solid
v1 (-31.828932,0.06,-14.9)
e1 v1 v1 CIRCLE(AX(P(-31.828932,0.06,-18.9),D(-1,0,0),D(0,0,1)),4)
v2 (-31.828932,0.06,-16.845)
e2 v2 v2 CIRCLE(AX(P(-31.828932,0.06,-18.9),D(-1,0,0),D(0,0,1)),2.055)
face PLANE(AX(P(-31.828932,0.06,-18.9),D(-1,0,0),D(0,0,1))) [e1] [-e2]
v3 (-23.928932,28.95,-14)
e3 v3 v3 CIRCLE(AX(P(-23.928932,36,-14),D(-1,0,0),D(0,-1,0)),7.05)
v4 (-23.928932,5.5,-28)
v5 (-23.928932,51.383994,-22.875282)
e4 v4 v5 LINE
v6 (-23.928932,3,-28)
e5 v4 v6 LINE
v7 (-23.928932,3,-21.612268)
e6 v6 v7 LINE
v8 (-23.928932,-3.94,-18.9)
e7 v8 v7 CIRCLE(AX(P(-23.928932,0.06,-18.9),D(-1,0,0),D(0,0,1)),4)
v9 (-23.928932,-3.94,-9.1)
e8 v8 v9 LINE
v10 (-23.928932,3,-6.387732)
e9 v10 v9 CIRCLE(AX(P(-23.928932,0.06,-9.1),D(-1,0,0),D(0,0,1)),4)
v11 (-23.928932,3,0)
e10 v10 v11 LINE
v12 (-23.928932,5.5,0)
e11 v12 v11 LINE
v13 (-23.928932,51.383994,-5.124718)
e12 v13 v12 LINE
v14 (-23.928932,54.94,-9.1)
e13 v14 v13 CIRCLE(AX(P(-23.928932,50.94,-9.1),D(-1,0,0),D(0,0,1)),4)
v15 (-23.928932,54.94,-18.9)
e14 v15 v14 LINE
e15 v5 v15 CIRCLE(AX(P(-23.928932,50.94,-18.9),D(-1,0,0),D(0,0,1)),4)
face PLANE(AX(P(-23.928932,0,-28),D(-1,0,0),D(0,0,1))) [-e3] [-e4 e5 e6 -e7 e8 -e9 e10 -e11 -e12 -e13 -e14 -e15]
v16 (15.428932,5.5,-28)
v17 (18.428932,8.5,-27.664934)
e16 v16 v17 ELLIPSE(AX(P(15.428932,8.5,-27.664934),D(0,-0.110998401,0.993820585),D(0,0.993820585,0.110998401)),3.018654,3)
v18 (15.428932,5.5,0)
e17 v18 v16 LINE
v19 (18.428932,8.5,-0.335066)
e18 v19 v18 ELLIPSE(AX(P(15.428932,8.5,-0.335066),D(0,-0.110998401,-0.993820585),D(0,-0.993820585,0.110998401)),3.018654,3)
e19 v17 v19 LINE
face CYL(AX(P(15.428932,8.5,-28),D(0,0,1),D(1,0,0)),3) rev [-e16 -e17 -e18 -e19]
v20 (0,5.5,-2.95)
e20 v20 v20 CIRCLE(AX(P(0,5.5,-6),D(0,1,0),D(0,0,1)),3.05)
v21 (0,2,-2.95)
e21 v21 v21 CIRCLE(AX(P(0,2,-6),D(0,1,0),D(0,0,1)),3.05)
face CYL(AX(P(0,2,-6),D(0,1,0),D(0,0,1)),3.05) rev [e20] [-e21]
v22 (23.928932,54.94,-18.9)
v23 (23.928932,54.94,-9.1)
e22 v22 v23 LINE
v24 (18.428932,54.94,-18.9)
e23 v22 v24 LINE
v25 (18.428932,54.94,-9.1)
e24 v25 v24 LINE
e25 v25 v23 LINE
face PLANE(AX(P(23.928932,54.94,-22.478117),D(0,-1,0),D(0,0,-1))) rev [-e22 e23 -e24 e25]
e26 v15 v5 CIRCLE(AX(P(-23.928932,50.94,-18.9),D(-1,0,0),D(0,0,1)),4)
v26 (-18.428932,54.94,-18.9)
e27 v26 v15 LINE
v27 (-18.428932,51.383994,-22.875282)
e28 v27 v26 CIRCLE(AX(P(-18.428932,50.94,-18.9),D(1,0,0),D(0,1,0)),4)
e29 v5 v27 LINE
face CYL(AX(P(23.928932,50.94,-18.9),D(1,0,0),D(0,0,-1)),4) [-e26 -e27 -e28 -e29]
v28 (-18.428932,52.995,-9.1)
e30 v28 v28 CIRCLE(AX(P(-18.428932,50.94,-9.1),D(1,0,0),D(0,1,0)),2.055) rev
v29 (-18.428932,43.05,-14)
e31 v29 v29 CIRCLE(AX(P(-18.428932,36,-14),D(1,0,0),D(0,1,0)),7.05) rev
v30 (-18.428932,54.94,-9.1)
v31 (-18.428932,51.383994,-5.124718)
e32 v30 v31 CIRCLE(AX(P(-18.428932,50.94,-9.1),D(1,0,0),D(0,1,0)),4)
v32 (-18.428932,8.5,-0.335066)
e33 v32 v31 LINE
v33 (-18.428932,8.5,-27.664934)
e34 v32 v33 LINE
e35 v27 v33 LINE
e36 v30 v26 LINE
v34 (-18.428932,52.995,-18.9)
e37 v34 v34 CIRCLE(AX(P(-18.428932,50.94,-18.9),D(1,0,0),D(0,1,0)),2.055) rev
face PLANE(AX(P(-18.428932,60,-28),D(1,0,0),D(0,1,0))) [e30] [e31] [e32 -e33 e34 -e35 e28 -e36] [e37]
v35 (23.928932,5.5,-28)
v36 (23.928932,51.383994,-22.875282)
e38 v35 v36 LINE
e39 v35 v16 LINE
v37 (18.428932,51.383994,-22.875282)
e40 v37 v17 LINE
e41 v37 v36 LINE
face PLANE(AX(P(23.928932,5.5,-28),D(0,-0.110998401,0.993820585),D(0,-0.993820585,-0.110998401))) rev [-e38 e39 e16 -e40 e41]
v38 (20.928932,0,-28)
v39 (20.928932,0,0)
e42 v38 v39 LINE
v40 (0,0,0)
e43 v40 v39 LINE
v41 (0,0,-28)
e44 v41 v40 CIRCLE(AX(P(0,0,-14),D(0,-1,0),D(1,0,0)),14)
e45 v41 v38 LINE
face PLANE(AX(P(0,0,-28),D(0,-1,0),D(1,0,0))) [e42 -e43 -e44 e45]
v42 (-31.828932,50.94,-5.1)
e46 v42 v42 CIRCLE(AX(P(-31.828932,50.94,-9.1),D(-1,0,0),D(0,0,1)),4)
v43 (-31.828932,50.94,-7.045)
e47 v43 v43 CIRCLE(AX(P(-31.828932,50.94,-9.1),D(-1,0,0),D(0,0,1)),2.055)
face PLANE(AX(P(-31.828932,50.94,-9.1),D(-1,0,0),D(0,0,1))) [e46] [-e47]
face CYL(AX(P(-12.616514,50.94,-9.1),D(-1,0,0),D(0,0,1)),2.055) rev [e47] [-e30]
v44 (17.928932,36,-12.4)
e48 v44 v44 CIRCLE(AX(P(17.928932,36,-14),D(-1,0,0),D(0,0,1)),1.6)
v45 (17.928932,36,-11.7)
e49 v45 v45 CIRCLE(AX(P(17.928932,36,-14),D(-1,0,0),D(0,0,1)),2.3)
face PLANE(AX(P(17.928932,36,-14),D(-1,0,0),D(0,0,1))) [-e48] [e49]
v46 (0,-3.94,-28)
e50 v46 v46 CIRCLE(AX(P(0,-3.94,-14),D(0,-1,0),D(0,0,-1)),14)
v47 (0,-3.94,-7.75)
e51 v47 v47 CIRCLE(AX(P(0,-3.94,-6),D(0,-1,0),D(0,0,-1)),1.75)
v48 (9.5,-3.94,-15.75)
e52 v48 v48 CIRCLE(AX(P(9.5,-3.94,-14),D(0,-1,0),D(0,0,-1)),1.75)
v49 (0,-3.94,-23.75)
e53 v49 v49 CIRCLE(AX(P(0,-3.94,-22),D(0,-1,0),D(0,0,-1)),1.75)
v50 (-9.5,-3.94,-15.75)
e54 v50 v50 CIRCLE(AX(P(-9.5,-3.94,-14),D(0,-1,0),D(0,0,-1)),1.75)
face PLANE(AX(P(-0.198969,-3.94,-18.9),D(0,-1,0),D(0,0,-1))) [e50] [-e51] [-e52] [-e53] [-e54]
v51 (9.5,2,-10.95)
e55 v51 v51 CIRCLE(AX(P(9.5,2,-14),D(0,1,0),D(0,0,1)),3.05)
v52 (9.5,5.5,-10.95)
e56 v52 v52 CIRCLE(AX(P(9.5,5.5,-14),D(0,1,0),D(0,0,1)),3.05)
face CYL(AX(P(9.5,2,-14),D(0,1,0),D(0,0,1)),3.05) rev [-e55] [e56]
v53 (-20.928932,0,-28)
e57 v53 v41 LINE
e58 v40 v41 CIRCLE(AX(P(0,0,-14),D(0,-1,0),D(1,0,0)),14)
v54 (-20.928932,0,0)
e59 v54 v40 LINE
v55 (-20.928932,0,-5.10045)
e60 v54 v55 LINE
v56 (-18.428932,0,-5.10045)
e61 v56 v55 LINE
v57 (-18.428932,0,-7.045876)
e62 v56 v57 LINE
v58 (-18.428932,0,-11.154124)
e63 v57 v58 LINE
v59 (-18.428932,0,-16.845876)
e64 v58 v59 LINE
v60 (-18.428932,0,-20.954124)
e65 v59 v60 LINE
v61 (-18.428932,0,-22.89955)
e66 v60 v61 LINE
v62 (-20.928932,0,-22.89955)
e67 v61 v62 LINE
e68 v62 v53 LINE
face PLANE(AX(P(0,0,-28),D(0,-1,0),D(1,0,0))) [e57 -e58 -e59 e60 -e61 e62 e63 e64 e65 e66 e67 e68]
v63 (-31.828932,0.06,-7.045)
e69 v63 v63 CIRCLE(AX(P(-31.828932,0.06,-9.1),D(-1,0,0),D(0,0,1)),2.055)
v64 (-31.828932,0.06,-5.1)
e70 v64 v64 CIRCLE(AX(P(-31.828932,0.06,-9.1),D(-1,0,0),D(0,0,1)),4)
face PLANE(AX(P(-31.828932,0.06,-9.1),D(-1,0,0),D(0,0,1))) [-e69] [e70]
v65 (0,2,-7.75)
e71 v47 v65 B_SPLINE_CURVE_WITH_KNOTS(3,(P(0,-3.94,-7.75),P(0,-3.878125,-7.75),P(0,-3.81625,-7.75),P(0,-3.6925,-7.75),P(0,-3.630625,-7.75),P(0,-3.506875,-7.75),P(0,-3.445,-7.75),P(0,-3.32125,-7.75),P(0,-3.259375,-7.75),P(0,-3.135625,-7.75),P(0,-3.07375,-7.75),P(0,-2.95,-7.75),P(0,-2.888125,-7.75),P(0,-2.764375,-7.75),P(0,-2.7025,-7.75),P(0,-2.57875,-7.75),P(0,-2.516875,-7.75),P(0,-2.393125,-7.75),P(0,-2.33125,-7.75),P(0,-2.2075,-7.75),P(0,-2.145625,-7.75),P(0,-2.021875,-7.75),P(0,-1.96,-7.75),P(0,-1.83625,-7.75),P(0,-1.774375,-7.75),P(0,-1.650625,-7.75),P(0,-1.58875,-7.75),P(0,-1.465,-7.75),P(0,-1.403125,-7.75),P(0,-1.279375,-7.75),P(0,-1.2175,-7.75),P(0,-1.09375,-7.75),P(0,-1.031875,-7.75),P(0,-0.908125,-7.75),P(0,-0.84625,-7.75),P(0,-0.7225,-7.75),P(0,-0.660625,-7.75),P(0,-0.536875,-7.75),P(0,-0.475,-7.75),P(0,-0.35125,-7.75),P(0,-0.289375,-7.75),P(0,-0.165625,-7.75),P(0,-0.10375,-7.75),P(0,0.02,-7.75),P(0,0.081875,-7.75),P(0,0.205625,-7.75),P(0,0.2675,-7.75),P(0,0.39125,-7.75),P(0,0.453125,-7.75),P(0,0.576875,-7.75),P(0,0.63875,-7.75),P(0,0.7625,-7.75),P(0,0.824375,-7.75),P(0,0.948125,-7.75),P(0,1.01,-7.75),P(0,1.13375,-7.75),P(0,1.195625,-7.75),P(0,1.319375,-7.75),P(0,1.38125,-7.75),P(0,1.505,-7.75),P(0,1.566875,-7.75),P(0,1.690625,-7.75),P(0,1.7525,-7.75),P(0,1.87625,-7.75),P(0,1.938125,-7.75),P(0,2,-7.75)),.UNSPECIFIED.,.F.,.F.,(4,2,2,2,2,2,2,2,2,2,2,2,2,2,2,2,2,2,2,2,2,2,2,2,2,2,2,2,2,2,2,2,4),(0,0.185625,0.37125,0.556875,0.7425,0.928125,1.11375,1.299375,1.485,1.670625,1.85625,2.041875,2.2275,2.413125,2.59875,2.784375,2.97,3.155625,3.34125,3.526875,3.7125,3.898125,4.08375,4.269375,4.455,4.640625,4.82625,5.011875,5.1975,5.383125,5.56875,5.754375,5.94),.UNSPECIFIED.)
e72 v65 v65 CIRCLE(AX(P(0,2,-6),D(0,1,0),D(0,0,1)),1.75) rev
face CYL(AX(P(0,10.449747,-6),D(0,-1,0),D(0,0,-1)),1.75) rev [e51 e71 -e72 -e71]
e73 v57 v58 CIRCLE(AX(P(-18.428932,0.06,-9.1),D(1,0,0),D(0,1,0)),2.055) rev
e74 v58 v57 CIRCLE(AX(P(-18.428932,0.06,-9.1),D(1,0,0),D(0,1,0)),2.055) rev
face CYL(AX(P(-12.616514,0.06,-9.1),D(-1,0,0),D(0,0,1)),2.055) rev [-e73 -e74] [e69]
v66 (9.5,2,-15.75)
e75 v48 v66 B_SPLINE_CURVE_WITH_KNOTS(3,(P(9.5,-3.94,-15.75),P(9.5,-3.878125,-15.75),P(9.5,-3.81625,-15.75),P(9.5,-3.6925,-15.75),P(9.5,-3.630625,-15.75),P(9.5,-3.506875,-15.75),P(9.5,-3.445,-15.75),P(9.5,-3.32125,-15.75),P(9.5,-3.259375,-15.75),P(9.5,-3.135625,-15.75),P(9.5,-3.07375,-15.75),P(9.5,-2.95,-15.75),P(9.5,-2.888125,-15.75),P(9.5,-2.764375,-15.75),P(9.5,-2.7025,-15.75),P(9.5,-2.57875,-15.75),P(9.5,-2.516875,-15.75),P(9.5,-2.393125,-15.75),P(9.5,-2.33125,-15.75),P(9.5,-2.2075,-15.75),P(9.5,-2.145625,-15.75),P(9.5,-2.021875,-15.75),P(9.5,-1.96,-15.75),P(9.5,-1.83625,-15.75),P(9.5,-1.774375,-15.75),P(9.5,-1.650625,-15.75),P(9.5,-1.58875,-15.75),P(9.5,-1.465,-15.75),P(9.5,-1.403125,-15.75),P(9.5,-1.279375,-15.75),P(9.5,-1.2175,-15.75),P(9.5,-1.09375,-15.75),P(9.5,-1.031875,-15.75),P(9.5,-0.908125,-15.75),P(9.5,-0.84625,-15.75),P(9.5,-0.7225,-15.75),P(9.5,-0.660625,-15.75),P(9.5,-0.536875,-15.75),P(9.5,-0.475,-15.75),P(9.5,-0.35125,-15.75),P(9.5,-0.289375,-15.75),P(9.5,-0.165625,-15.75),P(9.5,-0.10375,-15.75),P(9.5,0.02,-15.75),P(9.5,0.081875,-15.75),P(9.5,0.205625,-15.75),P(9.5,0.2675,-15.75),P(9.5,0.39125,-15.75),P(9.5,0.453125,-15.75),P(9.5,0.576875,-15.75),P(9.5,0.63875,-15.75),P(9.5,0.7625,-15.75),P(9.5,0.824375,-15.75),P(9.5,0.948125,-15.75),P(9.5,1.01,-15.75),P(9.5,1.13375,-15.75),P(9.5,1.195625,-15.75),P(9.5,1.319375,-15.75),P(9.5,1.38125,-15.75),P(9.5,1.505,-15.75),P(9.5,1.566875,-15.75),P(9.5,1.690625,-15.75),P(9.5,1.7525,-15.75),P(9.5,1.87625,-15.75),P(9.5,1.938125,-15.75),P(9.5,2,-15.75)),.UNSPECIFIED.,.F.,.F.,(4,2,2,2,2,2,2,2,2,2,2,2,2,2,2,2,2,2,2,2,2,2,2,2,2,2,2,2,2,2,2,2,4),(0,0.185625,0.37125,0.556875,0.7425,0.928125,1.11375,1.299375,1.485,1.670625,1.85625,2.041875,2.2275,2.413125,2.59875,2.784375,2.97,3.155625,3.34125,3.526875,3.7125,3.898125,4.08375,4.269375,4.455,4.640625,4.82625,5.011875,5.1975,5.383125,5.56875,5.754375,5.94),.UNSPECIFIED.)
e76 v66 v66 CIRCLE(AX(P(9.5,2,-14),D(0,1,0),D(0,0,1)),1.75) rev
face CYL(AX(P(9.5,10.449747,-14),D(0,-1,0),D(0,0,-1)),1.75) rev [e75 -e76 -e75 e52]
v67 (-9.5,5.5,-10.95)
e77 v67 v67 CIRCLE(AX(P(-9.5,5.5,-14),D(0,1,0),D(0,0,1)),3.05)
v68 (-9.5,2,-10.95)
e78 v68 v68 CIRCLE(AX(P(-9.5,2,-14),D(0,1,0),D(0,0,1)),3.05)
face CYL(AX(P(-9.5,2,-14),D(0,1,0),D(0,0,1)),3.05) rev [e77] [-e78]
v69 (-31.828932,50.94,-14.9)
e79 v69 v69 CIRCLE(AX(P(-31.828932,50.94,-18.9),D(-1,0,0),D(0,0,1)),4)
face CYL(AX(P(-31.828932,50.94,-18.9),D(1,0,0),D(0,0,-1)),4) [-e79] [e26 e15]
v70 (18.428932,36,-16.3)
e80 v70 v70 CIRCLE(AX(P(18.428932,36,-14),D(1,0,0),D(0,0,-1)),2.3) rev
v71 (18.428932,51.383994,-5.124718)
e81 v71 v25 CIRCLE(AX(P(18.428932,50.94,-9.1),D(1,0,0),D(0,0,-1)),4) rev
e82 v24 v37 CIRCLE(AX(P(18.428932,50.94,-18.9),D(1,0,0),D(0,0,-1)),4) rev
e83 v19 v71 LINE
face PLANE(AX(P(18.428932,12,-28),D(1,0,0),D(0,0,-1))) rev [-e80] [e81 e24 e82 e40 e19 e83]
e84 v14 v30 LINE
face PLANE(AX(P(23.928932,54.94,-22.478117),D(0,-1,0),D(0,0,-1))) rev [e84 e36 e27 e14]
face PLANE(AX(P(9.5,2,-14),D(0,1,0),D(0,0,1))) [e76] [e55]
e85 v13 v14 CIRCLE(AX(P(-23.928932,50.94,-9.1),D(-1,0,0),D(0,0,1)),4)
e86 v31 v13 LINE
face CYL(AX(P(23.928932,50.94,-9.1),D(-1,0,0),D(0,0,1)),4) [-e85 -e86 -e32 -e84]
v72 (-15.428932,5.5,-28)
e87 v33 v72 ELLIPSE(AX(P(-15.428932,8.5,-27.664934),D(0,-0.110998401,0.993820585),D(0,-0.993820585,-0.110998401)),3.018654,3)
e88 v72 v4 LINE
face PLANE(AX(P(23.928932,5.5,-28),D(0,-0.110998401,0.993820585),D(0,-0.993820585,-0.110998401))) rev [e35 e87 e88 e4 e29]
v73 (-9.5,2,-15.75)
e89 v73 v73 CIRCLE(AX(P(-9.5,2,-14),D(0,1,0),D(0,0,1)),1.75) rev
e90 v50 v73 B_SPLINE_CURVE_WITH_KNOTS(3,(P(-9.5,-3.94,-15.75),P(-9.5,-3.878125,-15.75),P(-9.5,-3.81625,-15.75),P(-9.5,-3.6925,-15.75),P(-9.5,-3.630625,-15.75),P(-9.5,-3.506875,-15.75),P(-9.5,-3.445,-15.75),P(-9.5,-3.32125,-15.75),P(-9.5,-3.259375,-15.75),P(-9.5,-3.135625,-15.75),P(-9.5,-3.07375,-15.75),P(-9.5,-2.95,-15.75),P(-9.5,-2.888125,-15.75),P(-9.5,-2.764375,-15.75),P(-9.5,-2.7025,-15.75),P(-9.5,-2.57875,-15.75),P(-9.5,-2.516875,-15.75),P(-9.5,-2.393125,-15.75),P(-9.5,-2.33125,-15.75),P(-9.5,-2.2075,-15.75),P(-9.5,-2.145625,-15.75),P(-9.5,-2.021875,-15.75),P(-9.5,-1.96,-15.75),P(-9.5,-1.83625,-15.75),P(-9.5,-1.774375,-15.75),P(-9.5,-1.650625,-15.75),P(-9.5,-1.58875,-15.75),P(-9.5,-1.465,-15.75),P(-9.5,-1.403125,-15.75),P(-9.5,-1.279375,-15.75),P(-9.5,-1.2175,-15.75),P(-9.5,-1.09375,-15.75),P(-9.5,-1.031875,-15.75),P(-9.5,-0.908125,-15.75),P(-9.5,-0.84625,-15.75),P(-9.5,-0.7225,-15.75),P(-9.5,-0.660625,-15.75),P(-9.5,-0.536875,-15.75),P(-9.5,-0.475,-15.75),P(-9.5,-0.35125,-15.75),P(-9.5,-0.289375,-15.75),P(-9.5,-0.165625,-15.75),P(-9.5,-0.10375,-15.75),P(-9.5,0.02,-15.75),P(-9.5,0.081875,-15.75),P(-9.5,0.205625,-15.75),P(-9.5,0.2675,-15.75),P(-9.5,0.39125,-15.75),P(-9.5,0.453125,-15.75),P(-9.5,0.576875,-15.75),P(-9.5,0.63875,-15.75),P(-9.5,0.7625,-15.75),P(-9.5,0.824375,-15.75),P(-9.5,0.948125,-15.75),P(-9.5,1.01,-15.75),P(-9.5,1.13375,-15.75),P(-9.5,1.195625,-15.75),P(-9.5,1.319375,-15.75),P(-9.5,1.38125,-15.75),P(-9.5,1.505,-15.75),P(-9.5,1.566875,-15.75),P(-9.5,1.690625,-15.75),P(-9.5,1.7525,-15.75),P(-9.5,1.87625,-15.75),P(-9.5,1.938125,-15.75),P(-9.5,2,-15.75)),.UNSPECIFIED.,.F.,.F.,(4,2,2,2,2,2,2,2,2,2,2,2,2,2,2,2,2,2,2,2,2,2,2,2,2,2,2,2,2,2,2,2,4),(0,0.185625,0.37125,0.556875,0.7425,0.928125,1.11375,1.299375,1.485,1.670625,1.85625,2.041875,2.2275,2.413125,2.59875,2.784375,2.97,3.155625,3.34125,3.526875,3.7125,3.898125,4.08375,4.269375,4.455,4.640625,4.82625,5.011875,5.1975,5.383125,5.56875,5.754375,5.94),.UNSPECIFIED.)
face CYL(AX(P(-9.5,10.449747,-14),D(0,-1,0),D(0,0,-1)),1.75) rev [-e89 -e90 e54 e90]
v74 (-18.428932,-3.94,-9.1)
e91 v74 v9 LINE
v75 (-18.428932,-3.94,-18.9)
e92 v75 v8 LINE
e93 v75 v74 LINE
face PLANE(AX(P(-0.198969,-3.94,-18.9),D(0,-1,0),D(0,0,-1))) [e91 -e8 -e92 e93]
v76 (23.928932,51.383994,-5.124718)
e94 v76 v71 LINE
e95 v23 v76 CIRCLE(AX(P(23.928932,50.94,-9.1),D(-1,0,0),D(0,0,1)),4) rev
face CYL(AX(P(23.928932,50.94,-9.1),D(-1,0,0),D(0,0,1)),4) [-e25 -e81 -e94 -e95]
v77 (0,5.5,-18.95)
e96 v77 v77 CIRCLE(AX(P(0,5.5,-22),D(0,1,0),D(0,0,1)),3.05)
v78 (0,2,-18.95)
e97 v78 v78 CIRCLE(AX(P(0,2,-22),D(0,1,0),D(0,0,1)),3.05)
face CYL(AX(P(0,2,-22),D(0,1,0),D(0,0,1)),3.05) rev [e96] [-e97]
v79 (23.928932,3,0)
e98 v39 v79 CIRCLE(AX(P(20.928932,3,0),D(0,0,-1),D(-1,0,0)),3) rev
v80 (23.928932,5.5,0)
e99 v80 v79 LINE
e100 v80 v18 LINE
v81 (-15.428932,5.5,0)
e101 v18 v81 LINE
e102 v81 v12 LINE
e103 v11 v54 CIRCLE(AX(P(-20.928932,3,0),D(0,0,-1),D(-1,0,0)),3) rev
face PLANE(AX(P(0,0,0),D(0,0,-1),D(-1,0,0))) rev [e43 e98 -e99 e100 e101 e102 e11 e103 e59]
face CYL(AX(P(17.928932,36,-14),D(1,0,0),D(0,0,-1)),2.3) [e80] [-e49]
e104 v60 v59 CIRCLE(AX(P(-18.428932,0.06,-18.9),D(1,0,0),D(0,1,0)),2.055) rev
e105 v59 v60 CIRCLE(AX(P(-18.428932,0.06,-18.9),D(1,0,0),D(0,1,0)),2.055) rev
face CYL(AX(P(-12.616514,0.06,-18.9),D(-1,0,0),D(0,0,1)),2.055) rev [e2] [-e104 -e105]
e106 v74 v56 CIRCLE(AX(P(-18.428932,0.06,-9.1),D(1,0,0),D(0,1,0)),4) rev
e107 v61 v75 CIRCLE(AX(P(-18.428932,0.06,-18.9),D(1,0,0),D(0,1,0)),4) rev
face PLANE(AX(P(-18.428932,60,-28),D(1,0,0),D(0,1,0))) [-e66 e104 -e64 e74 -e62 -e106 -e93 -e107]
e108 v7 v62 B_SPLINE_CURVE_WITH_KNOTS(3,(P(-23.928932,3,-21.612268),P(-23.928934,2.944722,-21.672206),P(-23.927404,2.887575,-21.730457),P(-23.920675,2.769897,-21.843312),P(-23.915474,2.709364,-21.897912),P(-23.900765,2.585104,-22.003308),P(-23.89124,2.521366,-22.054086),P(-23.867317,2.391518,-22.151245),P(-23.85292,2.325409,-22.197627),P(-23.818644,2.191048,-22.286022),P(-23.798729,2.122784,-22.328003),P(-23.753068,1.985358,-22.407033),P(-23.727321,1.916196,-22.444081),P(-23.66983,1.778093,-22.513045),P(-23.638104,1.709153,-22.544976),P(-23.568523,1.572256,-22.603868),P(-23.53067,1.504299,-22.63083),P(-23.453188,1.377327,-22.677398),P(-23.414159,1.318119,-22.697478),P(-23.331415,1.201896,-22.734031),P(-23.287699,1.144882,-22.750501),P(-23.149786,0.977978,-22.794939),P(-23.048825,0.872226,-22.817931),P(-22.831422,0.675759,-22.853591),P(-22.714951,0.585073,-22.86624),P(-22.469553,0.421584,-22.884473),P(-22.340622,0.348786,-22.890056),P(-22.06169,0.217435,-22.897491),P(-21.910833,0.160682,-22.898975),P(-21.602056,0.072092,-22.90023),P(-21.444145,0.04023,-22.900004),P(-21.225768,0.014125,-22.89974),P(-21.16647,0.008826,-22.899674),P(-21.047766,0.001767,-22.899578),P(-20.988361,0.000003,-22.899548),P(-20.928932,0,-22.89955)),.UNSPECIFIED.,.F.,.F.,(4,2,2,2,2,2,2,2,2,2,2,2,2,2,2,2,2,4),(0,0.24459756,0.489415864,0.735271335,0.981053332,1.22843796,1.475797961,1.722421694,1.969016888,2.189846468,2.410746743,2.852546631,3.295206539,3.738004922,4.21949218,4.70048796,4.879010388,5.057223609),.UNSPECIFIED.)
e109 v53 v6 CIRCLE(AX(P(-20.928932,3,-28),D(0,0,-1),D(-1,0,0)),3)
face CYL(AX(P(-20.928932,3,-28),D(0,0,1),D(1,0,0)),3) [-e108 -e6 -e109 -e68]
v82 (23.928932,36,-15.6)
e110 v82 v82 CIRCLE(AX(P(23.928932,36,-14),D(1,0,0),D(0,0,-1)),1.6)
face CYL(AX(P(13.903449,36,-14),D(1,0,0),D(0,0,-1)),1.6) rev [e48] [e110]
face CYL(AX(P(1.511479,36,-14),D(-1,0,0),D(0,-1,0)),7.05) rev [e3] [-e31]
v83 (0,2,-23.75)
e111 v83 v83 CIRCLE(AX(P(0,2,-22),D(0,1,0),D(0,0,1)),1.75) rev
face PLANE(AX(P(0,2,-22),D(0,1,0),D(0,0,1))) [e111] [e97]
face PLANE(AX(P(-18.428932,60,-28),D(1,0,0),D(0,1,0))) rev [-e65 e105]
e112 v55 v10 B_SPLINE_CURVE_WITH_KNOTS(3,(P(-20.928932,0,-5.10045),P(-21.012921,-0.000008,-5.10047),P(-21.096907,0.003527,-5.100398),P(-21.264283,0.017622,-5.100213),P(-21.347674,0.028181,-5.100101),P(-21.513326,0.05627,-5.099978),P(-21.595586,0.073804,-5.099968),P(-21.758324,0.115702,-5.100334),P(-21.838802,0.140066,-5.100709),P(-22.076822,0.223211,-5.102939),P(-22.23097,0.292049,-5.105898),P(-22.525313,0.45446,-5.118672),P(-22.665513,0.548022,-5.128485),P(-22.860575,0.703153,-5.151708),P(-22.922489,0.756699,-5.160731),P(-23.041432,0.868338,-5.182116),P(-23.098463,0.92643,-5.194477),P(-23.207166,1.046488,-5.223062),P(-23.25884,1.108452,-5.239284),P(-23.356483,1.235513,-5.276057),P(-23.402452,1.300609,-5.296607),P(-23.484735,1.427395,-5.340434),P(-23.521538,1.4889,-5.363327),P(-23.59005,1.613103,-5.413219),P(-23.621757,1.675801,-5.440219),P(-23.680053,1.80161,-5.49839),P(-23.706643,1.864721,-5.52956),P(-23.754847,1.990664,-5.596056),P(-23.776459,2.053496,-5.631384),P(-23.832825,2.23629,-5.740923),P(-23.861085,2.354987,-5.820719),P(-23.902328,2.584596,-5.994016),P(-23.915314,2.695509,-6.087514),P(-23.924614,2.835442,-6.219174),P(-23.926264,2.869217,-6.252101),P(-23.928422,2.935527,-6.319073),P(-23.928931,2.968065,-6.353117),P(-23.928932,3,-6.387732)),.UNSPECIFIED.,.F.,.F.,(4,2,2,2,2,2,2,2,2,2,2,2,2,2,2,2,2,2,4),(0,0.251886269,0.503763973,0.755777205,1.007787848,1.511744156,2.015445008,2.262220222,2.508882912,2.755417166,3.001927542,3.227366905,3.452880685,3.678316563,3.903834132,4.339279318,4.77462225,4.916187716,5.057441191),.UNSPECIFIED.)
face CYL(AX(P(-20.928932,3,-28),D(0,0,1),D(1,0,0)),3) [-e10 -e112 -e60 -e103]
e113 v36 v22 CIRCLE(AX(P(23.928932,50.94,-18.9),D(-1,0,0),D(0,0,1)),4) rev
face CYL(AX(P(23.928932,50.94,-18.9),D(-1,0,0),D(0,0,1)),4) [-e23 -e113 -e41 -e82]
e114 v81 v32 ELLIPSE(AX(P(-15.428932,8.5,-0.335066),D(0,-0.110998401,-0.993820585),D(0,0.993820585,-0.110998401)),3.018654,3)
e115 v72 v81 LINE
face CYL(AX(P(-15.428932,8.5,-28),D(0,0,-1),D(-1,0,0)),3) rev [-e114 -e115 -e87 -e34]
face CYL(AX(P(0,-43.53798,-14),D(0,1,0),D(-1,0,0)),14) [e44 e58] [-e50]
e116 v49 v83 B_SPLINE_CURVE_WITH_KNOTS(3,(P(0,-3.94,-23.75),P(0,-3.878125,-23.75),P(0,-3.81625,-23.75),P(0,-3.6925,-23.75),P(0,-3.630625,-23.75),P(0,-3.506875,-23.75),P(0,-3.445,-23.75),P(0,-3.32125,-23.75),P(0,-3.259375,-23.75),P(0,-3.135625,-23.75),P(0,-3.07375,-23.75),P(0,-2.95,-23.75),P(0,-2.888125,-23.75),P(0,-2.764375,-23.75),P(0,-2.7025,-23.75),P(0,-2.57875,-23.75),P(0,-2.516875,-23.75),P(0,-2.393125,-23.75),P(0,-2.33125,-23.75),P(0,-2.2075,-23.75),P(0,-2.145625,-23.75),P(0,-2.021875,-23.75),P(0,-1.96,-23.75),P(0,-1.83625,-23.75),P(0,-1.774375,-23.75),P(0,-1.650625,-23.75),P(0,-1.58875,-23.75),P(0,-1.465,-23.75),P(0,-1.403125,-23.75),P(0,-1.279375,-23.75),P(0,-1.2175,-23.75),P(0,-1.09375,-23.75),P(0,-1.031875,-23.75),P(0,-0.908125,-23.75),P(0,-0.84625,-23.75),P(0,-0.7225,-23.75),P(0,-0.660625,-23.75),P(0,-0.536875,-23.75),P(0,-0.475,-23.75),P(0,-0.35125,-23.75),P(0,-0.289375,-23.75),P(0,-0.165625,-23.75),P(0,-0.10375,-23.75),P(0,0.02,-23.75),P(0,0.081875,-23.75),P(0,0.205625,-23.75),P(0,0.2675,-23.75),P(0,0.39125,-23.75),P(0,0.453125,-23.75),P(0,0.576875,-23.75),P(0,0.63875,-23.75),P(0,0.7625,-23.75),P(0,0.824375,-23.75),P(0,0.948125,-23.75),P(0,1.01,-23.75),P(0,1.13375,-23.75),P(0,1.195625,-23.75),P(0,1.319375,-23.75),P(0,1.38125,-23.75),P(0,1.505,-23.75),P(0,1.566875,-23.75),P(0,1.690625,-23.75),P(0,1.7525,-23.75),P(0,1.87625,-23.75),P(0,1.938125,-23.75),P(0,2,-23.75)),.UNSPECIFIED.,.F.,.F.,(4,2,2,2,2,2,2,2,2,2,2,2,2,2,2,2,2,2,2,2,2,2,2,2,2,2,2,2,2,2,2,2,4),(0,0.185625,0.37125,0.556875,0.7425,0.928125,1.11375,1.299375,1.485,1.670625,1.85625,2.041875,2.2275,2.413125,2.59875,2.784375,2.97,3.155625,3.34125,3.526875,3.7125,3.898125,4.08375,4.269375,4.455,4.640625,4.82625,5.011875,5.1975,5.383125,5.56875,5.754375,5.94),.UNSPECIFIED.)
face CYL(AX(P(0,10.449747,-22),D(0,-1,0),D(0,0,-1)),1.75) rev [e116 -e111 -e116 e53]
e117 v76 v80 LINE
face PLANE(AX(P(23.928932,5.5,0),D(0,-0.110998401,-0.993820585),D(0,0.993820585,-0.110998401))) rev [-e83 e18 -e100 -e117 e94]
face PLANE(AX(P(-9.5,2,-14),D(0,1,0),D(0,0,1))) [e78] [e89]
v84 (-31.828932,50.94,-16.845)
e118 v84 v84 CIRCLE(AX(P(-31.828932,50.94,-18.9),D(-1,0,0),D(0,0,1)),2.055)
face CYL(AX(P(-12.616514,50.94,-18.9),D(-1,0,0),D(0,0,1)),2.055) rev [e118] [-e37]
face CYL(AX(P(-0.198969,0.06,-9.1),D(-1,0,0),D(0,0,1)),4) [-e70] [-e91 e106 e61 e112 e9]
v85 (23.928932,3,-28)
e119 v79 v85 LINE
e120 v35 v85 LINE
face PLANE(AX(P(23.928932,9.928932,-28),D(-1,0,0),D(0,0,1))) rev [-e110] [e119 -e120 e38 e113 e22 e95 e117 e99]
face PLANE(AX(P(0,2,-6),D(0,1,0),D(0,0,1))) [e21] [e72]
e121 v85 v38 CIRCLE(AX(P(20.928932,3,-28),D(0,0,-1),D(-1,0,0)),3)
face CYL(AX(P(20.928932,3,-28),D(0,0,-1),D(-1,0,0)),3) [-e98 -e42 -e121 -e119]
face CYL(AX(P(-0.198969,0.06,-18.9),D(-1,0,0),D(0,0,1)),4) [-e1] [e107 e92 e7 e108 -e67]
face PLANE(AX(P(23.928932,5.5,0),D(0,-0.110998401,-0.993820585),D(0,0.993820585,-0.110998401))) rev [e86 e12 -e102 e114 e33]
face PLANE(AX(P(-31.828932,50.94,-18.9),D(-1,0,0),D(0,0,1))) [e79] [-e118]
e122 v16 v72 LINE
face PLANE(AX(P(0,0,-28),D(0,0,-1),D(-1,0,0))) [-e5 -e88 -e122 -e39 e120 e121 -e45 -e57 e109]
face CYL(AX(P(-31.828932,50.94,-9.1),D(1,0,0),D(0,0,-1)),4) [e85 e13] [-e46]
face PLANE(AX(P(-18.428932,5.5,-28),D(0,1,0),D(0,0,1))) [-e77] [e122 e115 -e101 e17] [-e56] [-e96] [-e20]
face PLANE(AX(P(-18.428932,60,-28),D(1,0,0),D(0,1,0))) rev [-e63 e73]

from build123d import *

# Parameters (mm, degrees)
GIMBAL_MOUNT_BODY_DEPTH        = 28
SKETCH7_R                      = 7.05
SERVO_GEAR_MOUND_CUT_OUT_DEPTH = 5.5
BOSS_EXTRUDE6_DEPTH            = 5.5
BOSS_EXTRUDE7_START            = 7.9
SKETCH15_R                     = 4
BOSS_EXTRUDE7_DEPTH            = 7.9
SKETCH17_R                     = 1.6
CUT_EXTRUDE2_DEPTH             = 5.5
SKETCH19_R                     = 14
BOSS_EXTRUDE9_DEPTH            = 3.94
SKETCH20_R                     = 1.75
CUT_EXTRUDE4_DEPTH             = 9.44
SKETCH21_R                     = 2.055
CUT_EXTRUDE5_DEPTH             = 13.4
SKETCH30_R                     = 2.3
SKETCH30_R_2                   = 1.6
BOSS_EXTRUDE10_DEPTH           = 0.5
CUT_EXTRUDE11_DEPTH            = 82.696849282
SKETCH29_R                     = 3.05
CUT_EXTRUDE12_DEPTH            = 3.5
CUT_EXTRUDE7_DEPTH             = 82.696849282
FILLET4_R                      = 3
FILLET5_R                      = 4


# Some blends are built 0.0001 mm under size
with BuildPart() as part:
    # Sketch6 → Gimbal Mount Body (new body)
    with BuildSketch(Plane.XY):
        Polygon((0, 0), (-14, 0), (-23.928932188, 0), (-23.928932188, 9.928932188), (-23.928932188, 60), (-18.428932188, 60), (-18.428932188, 12), (-18.428932188, 5.5), (-11.928932188, 5.5), (0, 5.5), align=None)
    gimbal_mount_body = extrude(amount=-GIMBAL_MOUNT_BODY_DEPTH)

    # Gimbal Mount Body Mirror: Gimbal Mount Body across plane
    add(gimbal_mount_body.mirror(Plane(origin=(0, 0, 0), x_dir=(0, 0, 1), z_dir=(1, 0, 0))))

    # Sketch7 → Servo Gear Mound Cut Out (cut)
    with BuildSketch(Plane.ZY.offset(23.928932188)):
        with Locations(Location((-14, 36, 0), (0, 0, 270))):
            Circle(SKETCH7_R)
    extrude(amount=-SERVO_GEAR_MOUND_CUT_OUT_DEPTH, mode=Mode.SUBTRACT)

    # Sketch14 → Boss-Extrude6 (add)
    with BuildSketch(Plane.ZY.offset(23.928932188)):
        with BuildLine():
            Line((-18.9, -3.94), (-9.1, -3.94))
            ThreePointArc((-9.1, -3.94), (-6.29286623, -2.78956137), (-5.100450025, 0))
            Line((-5.100450025, 0), (-22.899549975, 0))
            ThreePointArc((-22.899549975, 0), (-21.70713377, -2.78956137), (-18.9, -3.94))
        make_face()
    extrude(amount=-BOSS_EXTRUDE6_DEPTH)

    # Sketch15 → Boss-Extrude7 (add)
    with BuildSketch(Plane.ZY.offset(23.928932188).offset(BOSS_EXTRUDE7_START)):
        with Locations((-18.9, 50.94)):
            Circle(SKETCH15_R)
        with Locations((-9.1, 50.94)):
            Circle(SKETCH15_R)
        with Locations((-18.9, 0.06)):
            Circle(SKETCH15_R)
        with Locations((-9.1, 0.06)):
            Circle(SKETCH15_R)
    extrude(amount=-BOSS_EXTRUDE7_DEPTH)

    # Sketch17 → Cut-Extrude2 (cut)
    with BuildSketch(Plane(origin=(23.928932188, 0, 0), x_dir=(0, 0, -1), z_dir=(1, 0, 0))):
        with Locations((14, 36)):
            Circle(SKETCH17_R)
    extrude(amount=-CUT_EXTRUDE2_DEPTH, mode=Mode.SUBTRACT)

    # Sketch19 → Boss-Extrude9 (add)
    with BuildSketch(Plane.XZ):
        with Locations(Location((0, -14, 0), (0, 0, 270))):
            Circle(SKETCH19_R)
    extrude(amount=BOSS_EXTRUDE9_DEPTH)

    # Sketch20 → Cut-Extrude4 (cut)
    with BuildSketch(Plane.XZ.offset(3.94)):
        with Locations(Location((0, -6, 0), (0, 0, 270))):
            Circle(SKETCH20_R)
        with Locations(Location((-9.5, -14, 0), (0, 0, 270))):
            Circle(SKETCH20_R)
        with Locations(Location((9.5, -14, 0), (0, 0, 270))):
            Circle(SKETCH20_R)
        with Locations(Location((0, -22, 0), (0, 0, 270))):
            Circle(SKETCH20_R)
    extrude(amount=-CUT_EXTRUDE4_DEPTH, mode=Mode.SUBTRACT)

    # Sketch21 → Cut-Extrude5 (cut)
    with BuildSketch(Plane.ZY.offset(31.828932188)):
        with Locations((-18.9, 50.94)):
            Circle(SKETCH21_R)
        with Locations((-9.1, 50.94)):
            Circle(SKETCH21_R)
        with Locations((-9.1, 0.06)):
            Circle(SKETCH21_R)
        with Locations((-18.9, 0.06)):
            Circle(SKETCH21_R)
    extrude(amount=-CUT_EXTRUDE5_DEPTH, mode=Mode.SUBTRACT)

    # Sketch30 → Boss-Extrude10 (add)
    with BuildSketch(Plane.ZY.offset(-18.428932188)):
        with Locations(Location((-14, 36, 0), (0, 0, 180))):
            Circle(SKETCH30_R)
        with Locations(Location((-14, 36, 0), (0, 0, 180))):
            Circle(SKETCH30_R_2, mode=Mode.SUBTRACT)
    extrude(amount=BOSS_EXTRUDE10_DEPTH)

    # Sketch28 → Cut-Extrude11 (cut, through all)
    with BuildSketch(Plane.ZY.offset(23.928932188)):
        Polygon((0, 5.5), (-6.087027099, 60), (0, 60), align=None)
        Polygon((-28, 5.5), (-21.912972901, 60), (-28, 60), align=None)
    extrude(amount=-CUT_EXTRUDE11_DEPTH, mode=Mode.SUBTRACT)

    # Sketch29 → Cut-Extrude12 (cut)
    with BuildSketch(Plane(origin=(0, 5.5, 0), x_dir=(1, 0, 0), z_dir=(0, 1, 0))):
        with Locations(Location((0, 22, 0), (0, 0, 270))):
            Circle(SKETCH29_R)
        with Locations(Location((-9.5, 14, 0), (0, 0, 270))):
            Circle(SKETCH29_R)
        with Locations(Location((0, 6, 0), (0, 0, 270))):
            Circle(SKETCH29_R)
        with Locations(Location((9.5, 14, 0), (0, 0, 270))):
            Circle(SKETCH29_R)
    extrude(amount=-CUT_EXTRUDE12_DEPTH, mode=Mode.SUBTRACT)

    # Sketch23 → Cut-Extrude7 (cut, through all)
    with BuildSketch(Plane.ZY.offset(23.928932188)):
        Polygon((-21.912972901, 60), (-6.087027099, 60), (-5.521882932, 54.94), (-22.478117068, 54.94), align=None)
    extrude(amount=-CUT_EXTRUDE7_DEPTH, mode=Mode.SUBTRACT)

    # Fillet4
    # the kernel refuses this fillet: 3 mm, written as the material it adds along each edge
    with BuildSketch(Plane(origin=(-18.428932188, 5.5, 0), x_dir=(1, 0, 0), z_dir=(0, 0, -1))) as fillet4_piece_1_section:
        with BuildLine():
            CenterArc((FILLET4_R, -FILLET4_R), FILLET4_R, 90, 90)
            Line((0, -FILLET4_R), (-FILLET4_R * 0.02, -FILLET4_R))
            Line((-FILLET4_R * 0.02, -FILLET4_R), (-FILLET4_R * 0.02, FILLET4_R * 0.02))
            Line((-FILLET4_R * 0.02, FILLET4_R * 0.02), (FILLET4_R, FILLET4_R * 0.02))
            Line((FILLET4_R, FILLET4_R * 0.02), (FILLET4_R, 0))
        make_face()
    fillet4_piece_1 = extrude(amount=28, mode=Mode.PRIVATE)
    fillet4_piece_1 = split(fillet4_piece_1, bisect_by=Plane(origin=(-17.747779905, 7.711892033, -27.75295694), z_dir=(0, -0.11099840059468292, 0.9938205849475158)), keep=Keep.TOP, mode=Mode.PRIVATE)
    fillet4_piece_1 = split(fillet4_piece_1, bisect_by=Plane(origin=(-17.747779905, 7.711892033, -0.24704306), z_dir=(0, -0.11099840059468276, -0.9938205849475158)), keep=Keep.TOP, mode=Mode.PRIVATE)
    add(fillet4_piece_1)
    with BuildSketch(Plane(origin=(18.428932188, 5.5, 0), x_dir=(-1, 0, 0), z_dir=(0, 0, -1))) as fillet4_piece_2_section:
        with BuildLine():
            CenterArc((FILLET4_R, FILLET4_R), FILLET4_R, 180, 90)
            Line((0, FILLET4_R), (-FILLET4_R * 0.02, FILLET4_R))
            Line((-FILLET4_R * 0.02, FILLET4_R), (-FILLET4_R * 0.02, -FILLET4_R * 0.02))
            Line((-FILLET4_R * 0.02, -FILLET4_R * 0.02), (FILLET4_R, -FILLET4_R * 0.02))
            Line((FILLET4_R, -FILLET4_R * 0.02), (FILLET4_R, 0))
        make_face()
    fillet4_piece_2 = extrude(amount=28, mode=Mode.PRIVATE)
    fillet4_piece_2 = split(fillet4_piece_2, bisect_by=Plane(origin=(17.747779905, 7.711892033, -27.75295694), z_dir=(0, -0.11099840059468292, 0.9938205849475158)), keep=Keep.TOP, mode=Mode.PRIVATE)
    fillet4_piece_2 = split(fillet4_piece_2, bisect_by=Plane(origin=(17.747779905, 7.711892033, -0.24704306), z_dir=(0, -0.11099840059468276, -0.9938205849475158)), keep=Keep.TOP, mode=Mode.PRIVATE)
    add(fillet4_piece_2)
    # the kernel refuses this fillet: 3 mm, written as the material it takes off along each edge
    with BuildSketch(Plane(origin=(-23.928932188, 0, -19.899549975), x_dir=(1, 0, 0), z_dir=(0, 0, -1))) as fillet4_2_piece_1_section:
        with BuildLine():
            CenterArc((FILLET4_R, -FILLET4_R), FILLET4_R, 90, 90)
            Line((0, -FILLET4_R), (-FILLET4_R * 0.02, -FILLET4_R))
            Line((-FILLET4_R * 0.02, -FILLET4_R), (-FILLET4_R * 0.02, FILLET4_R * 0.02))
            Line((-FILLET4_R * 0.02, FILLET4_R * 0.02), (FILLET4_R, FILLET4_R * 0.02))
            Line((FILLET4_R, FILLET4_R * 0.02), (FILLET4_R, 0))
        make_face()
    fillet4_2_piece_1 = extrude(amount=11.100450025, mode=Mode.PRIVATE)
    fillet4_2_piece_1 = fillet4_2_piece_1 - Plane(origin=(-23.256393846, 0.06, -18.9), x_dir=(0, -0.014999999999998508, -0.999887493671163), z_dir=(-1, 0, 0)) * Cylinder(4, 35, mode=Mode.PRIVATE)
    add(fillet4_2_piece_1, mode=Mode.SUBTRACT)
    with BuildSketch(Plane(origin=(23.928932188, 0, 3), x_dir=(0, 1, 0), z_dir=(0, 0, -1))) as fillet4_2_piece_2:
        with BuildLine():
            CenterArc((FILLET4_R, -FILLET4_R), FILLET4_R, 90, 90)
            Line((0, -FILLET4_R), (-FILLET4_R * 0.02, -FILLET4_R))
            Line((-FILLET4_R * 0.02, -FILLET4_R), (-FILLET4_R * 0.02, FILLET4_R * 0.02))
            Line((-FILLET4_R * 0.02, FILLET4_R * 0.02), (FILLET4_R, FILLET4_R * 0.02))
            Line((FILLET4_R, FILLET4_R * 0.02), (FILLET4_R, 0))
        make_face()
    extrude(amount=34, mode=Mode.SUBTRACT)
    with BuildSketch(Plane(origin=(-23.928932188, 0, 3), x_dir=(1, 0, 0), z_dir=(0, 0, -1))) as fillet4_2_piece_3_section:
        with BuildLine():
            CenterArc((FILLET4_R, -FILLET4_R), FILLET4_R, 90, 90)
            Line((0, -FILLET4_R), (-FILLET4_R * 0.02, -FILLET4_R))
            Line((-FILLET4_R * 0.02, -FILLET4_R), (-FILLET4_R * 0.02, FILLET4_R * 0.02))
            Line((-FILLET4_R * 0.02, FILLET4_R * 0.02), (FILLET4_R, FILLET4_R * 0.02))
            Line((FILLET4_R, FILLET4_R * 0.02), (FILLET4_R, 0))
        make_face()
    fillet4_2_piece_3 = extrude(amount=11.100450025, mode=Mode.PRIVATE)
    fillet4_2_piece_3 = fillet4_2_piece_3 - Plane(origin=(-23.256393341, 0.06, -9.1), x_dir=(0, -1, 0), z_dir=(-1, 0, 0)) * Cylinder(4, 35, mode=Mode.PRIVATE)
    add(fillet4_2_piece_3, mode=Mode.SUBTRACT)

    # Fillet5
    fillet5_edges = [part.edges().sort_by_distance(p)[0] for p in [
        (21.178932188, 54.94, -5.521882932),
        (21.178932188, 54.94, -22.478117068),
        (-21.178932188, 54.94, -22.478117068),
        (-21.178932188, 54.94, -5.521882932),
    ]]
    fillet(fillet5_edges, radius=FILLET5_R - 0.0001)  # a hair under: the kernel refuses the full size


solid = part.part
